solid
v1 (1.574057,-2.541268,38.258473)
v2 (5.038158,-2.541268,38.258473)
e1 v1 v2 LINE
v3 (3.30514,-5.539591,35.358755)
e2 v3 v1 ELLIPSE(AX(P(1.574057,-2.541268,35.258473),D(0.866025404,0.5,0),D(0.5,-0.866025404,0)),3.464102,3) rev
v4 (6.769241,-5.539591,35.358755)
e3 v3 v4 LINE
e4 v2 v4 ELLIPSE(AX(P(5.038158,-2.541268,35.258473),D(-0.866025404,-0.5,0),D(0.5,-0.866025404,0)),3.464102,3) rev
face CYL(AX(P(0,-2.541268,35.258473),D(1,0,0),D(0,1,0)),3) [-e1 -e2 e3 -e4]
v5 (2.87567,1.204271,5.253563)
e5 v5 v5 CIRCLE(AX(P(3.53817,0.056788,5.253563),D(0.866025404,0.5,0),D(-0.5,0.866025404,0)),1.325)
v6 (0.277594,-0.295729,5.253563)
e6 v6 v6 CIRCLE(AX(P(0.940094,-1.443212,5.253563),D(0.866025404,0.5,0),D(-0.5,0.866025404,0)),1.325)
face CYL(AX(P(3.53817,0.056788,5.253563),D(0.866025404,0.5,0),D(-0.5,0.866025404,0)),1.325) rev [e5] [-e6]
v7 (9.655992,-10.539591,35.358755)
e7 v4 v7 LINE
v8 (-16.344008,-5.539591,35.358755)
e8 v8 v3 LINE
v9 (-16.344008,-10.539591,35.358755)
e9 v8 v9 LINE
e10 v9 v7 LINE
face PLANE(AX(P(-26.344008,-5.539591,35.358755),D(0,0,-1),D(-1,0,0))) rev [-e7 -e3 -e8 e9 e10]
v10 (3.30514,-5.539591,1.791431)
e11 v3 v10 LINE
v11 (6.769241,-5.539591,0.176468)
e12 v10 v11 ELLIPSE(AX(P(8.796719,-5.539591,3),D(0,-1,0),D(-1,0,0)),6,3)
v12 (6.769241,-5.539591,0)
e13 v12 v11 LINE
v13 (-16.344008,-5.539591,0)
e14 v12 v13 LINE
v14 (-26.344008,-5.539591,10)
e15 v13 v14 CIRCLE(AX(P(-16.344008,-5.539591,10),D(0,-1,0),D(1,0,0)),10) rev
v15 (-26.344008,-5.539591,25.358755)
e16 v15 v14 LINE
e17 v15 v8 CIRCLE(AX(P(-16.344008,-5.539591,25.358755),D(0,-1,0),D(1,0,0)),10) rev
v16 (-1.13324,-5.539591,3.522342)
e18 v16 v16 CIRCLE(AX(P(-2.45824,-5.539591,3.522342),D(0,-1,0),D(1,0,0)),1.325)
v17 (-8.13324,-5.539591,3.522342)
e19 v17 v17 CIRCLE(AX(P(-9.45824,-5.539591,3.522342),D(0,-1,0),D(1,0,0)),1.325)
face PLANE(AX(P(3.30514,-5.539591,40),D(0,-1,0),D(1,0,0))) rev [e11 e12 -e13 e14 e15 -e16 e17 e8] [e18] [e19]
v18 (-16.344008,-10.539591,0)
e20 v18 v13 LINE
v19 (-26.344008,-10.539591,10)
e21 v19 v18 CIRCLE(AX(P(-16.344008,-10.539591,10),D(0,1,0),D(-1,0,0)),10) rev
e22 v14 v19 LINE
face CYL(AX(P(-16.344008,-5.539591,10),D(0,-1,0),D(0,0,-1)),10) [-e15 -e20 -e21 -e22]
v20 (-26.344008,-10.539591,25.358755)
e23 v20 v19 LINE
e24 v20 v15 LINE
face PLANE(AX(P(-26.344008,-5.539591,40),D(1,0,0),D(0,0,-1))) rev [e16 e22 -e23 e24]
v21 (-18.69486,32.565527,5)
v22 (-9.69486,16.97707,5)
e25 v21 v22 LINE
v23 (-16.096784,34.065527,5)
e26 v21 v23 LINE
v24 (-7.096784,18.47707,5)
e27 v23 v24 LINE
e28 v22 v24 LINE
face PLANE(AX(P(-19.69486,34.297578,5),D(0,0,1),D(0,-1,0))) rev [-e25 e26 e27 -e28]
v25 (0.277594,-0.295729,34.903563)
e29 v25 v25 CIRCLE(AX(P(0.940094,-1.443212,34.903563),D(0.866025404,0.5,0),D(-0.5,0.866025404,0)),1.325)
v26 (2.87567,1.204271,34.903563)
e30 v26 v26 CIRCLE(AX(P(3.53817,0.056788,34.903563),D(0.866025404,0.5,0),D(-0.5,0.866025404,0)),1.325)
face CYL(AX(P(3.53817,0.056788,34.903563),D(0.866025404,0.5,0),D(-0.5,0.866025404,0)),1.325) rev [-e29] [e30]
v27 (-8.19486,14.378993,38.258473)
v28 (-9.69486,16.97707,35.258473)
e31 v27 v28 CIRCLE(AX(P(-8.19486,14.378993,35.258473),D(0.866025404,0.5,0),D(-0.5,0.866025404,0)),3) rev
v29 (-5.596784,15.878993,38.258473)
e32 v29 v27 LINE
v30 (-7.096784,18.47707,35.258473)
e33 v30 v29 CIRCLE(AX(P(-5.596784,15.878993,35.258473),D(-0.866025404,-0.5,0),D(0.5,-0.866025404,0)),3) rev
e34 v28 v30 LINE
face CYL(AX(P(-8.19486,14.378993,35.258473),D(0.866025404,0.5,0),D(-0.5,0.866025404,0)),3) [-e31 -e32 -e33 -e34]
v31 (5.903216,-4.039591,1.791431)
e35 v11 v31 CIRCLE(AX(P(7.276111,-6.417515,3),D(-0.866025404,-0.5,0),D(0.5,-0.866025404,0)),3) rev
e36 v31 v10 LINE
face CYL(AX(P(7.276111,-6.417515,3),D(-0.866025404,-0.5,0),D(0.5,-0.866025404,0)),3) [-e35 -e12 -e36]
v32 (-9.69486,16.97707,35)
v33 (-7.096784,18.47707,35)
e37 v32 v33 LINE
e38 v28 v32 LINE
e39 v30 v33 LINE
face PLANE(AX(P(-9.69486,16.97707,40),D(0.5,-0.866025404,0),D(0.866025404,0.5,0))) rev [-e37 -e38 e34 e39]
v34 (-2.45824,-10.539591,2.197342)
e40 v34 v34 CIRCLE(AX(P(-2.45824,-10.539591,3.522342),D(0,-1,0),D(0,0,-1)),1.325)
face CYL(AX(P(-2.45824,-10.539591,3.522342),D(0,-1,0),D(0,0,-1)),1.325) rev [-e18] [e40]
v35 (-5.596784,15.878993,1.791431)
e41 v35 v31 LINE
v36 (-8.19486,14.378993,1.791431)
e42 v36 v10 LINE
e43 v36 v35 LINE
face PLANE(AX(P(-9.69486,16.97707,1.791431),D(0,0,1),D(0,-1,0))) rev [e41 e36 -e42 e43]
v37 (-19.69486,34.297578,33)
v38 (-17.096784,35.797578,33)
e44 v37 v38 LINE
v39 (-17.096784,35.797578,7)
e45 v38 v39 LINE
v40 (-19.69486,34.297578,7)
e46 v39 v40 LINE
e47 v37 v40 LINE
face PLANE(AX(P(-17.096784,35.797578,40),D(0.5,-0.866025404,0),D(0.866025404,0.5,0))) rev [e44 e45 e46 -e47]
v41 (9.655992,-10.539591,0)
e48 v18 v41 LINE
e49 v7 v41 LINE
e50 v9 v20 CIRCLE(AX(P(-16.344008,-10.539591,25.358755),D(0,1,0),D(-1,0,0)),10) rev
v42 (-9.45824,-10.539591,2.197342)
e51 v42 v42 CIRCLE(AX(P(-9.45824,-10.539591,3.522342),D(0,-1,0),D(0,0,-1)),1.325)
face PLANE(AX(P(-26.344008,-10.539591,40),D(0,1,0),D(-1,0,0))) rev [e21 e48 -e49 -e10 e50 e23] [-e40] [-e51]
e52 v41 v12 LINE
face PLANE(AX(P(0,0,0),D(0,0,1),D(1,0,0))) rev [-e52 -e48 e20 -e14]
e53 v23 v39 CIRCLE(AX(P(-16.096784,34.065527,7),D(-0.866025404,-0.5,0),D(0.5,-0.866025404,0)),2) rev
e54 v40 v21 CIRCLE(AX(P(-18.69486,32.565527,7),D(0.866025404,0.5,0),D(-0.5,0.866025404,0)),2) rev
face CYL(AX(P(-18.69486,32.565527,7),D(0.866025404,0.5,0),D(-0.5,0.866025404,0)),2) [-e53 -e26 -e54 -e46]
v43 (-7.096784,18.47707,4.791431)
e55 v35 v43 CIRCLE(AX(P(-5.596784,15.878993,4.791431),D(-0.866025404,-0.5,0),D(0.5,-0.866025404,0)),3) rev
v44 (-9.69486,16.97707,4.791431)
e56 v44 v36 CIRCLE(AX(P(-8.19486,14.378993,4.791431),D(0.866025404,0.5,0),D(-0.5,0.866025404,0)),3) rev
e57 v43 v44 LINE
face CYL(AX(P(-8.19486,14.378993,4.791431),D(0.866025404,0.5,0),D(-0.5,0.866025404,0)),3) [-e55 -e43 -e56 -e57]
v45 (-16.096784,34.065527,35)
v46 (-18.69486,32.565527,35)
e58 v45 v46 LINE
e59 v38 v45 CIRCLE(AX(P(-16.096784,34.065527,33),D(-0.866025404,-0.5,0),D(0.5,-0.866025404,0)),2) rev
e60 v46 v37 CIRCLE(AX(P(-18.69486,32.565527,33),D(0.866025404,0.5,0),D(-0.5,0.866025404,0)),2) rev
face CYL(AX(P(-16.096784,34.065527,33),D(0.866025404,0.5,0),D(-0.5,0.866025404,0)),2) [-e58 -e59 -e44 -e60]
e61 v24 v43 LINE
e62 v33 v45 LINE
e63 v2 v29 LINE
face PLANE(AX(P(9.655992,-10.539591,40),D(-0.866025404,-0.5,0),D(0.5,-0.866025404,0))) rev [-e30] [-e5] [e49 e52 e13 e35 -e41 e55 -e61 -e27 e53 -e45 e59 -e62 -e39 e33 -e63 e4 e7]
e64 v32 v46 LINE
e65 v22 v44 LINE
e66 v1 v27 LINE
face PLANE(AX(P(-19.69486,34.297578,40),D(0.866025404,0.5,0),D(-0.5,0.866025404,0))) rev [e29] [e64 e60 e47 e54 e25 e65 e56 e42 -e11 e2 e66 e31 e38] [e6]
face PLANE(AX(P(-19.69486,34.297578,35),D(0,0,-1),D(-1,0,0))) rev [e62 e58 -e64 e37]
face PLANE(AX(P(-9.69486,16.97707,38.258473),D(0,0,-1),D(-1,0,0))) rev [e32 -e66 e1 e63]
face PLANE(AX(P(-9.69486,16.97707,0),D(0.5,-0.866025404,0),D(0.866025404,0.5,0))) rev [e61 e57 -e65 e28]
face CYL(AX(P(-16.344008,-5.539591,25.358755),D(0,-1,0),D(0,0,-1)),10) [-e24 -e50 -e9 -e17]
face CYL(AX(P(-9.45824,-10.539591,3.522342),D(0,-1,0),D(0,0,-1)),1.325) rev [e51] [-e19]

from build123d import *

# Parameters (mm, degrees)
EXTRUDE_1_DEPTH                  = 40
HOLE_START                       = 0.092539292
HOLE_WIZARD_3_0_2_65_1_OUTLINE_R = 1.325
HOLE_WIZARD_3_0_2_65_1_DEPTH     = 3
SKETCH_7_W                       = 5
SKETCH_7_H                       = 20
CUT_EXTRUDE_1_DEPTH              = 3
HOLE_START_2                     = -10.539590986
HOLE_WIZARD_3_0_2_65_2_OUTLINE_R = 1.325
HOLE_WIZARD_3_0_2_65_2_DEPTH     = 5
HOLE_WIZARD_3_0_2_65_3_OUTLINE_R = 1.325
HOLE_WIZARD_3_0_2_65_3_DEPTH     = 5
FILLET_3_R                       = 2
SKETCH_20_W                      = 36
SKETCH_20_H                      = 4.641244585
CUT_EXTRUDE_3_DEPTH              = 5
SKETCH_23_W                      = 1.741527355
SKETCH_23_H                      = 27.732050807
CUT_EXTRUDE_4_DEPTH              = 3
SKETCH_24_W                      = 1.79143138
SKETCH_24_H                      = 27.732050807
CUT_EXTRUDE_5_DEPTH              = 3
SKETCH_26_W                      = 1.79143138
SKETCH_26_H                      = 1.733650564
EXTRUDE_2_DEPTH                  = 3
FILLET_4_R                       = 10
FILLET_5_R                       = 3
FILLET_6_R                       = 3
FILLET_7_R                       = 3


# Read off the part's stored shape, not the designer's step: Ø3.0 (2.65) 直径孔1, Ø3.0 (2.65) 直径孔2, Ø3.0 (2.65) 直径孔3
with BuildPart() as part:
    # 草图1 → 凸台-拉伸1 (new body)
    with BuildSketch(Plane.XY):
        Polygon((-26.344007522, -10.539590986), (9.655992478, -10.539590986), (-17.096784272, 35.797577588), (-19.694860483, 34.297577588), (3.305139517, -5.539590986), (-26.344007522, -5.539590986), align=None)
    extrude(amount=EXTRUDE_1_DEPTH)

    # Ø3.0 (2.65) 直径孔1 outline → Ø3.0 (2.65) 直径孔1 (cut)
    with BuildSketch(Plane(origin=(0, 0, 0), x_dir=(0.500000000000004, -0.8660254037844363, 0), z_dir=(0.8660254037844363, 0.5000000000000042, 0)).offset(HOLE_START)):
        with Locations((1.719905554, -5.253562617)):
            Circle(HOLE_WIZARD_3_0_2_65_1_OUTLINE_R)
        with Locations((1.719905554, -34.903562617)):
            Circle(HOLE_WIZARD_3_0_2_65_1_OUTLINE_R)
    extrude(amount=HOLE_WIZARD_3_0_2_65_1_DEPTH, mode=Mode.SUBTRACT)

    # 草图7 → 切除-拉伸1 (cut)
    with BuildSketch(Plane(origin=(2.678217589, 1.546269646, 0), x_dir=(0, 0, -1), z_dir=(0.8660254037844364, 0.5000000000000041, 0))):
        with Locations((-37.5, 29.550003721)):
            Rectangle(SKETCH_7_W, SKETCH_7_H)
        with Locations((-2.5, 29.550003721)):
            Rectangle(SKETCH_7_W, SKETCH_7_H)
    extrude(amount=-CUT_EXTRUDE_1_DEPTH, mode=Mode.SUBTRACT)

    # Ø3.0 (2.65) 直径孔2 outline → Ø3.0 (2.65) 直径孔2 (cut)
    with BuildSketch(Plane(origin=(0, 0, 0), x_dir=(1, 0, 0), z_dir=(0, 1, 0)).offset(HOLE_START_2)):
        with Locations((-9.458240247, -3.522342215)):
            Circle(HOLE_WIZARD_3_0_2_65_2_OUTLINE_R)
        with Locations((-2.458240247, -3.522342215)):
            Circle(HOLE_WIZARD_3_0_2_65_2_OUTLINE_R)
    extrude(amount=HOLE_WIZARD_3_0_2_65_2_DEPTH, mode=Mode.SUBTRACT)

    # Ø3.0 (2.65) 直径孔3 outline → Ø3.0 (2.65) 直径孔3 (cut)
    with BuildSketch(Plane(origin=(0, 0, 0), x_dir=(1, 0, 0), z_dir=(0, 1, 0)).offset(HOLE_START_2)):
        with Locations((-1.947010607, -36.908916004)):
            Circle(HOLE_WIZARD_3_0_2_65_3_OUTLINE_R)
        with Locations((-8.947010607, -36.908916004)):
            Circle(HOLE_WIZARD_3_0_2_65_3_OUTLINE_R)
    extrude(amount=HOLE_WIZARD_3_0_2_65_3_DEPTH, mode=Mode.SUBTRACT)

    # 圆角3
    fillet_3_edges = [part.edges().sort_by_distance(p)[0] for p in [
        (-18.395822378, 35.047577588, 35),
        (-18.395822378, 35.047577588, 5),
    ]]
    fillet(fillet_3_edges, radius=FILLET_3_R)

    # 草图20 → 切除-拉伸3 (cut)
    with BuildSketch(Plane.XZ.offset(10.539590986)):
        with Locations((-8.344007522, 37.679377708)):
            Rectangle(SKETCH_20_W, SKETCH_20_H)
    extrude(amount=-CUT_EXTRUDE_3_DEPTH, mode=Mode.SUBTRACT)

    # 草图23 → 切除-拉伸4 (cut)
    with BuildSketch(Plane(origin=(2.678217589, 1.546269646, 0), x_dir=(0, 0, -1), z_dir=(0.8660254037844364, 0.5000000000000041, 0))):
        with Locations((-39.129236323, 5.683978317)):
            Rectangle(SKETCH_23_W, SKETCH_23_H)
    extrude(amount=-CUT_EXTRUDE_4_DEPTH, mode=Mode.SUBTRACT)

    # 草图24 → 切除-拉伸5 (cut)
    with BuildSketch(Plane(origin=(2.678217589, 1.546269646, 0), x_dir=(0, 0, -1), z_dir=(0.8660254037844364, 0.5000000000000041, 0))):
        with Locations((-0.89571569, 5.683978317)):
            Rectangle(SKETCH_24_W, SKETCH_24_H)
    extrude(amount=-CUT_EXTRUDE_5_DEPTH, mode=Mode.SUBTRACT)

    # 草图26 → 凸台-拉伸2 (add)
    with BuildSketch(Plane(origin=(0.080141377, 0.046269646, 0), x_dir=(0, 0, -1), z_dir=(0.8660254037844364, 0.5000000000000041, 0))):
        with Locations((-0.89571569, -7.316821561)):
            Rectangle(SKETCH_26_W, SKETCH_26_H)
    extrude(amount=EXTRUDE_2_DEPTH)

    # 圆角4
    fillet_4_edges = [part.edges().sort_by_distance(p)[0] for p in [
        (-26.344007522, -8.039590986, 35.358755415),
        (-26.344007522, -8.039590986, 0),
    ]]
    fillet(fillet_4_edges, radius=FILLET_4_R)

    # 圆角5
    fillet_5_edges = [part.edges().sort_by_distance(p)[0] for p in [
        (-8.395822378, 17.727069512, 38.258472645),
        (-8.395822378, 17.727069512, 1.79143138),
    ]]
    fillet(fillet_5_edges, radius=FILLET_5_R)

    # 圆角6
    # the kernel refuses this fillet: 3 mm, written as the material it takes off along each edge
    with BuildSketch(Plane(origin=(14.265049697, -5.539590986, 38.258472645), x_dir=(0, 0, -1), z_dir=(-1, 0, 0))) as fillet_6_piece_1:
        with BuildLine():
            CenterArc((3, -2.998323426), FILLET_6_R, 91.915616688, 88.084383312)
            Line((0, -2.998323426), (-0.06, -2.998323426))
            Line((-0.06, -2.998323426), (-0.06, 0))
            Line((-0.06, 0), (0, 0.06))
            ThreePointArc((0, 0.06), (1.449858615, 0.06), (2.897711575, 0.059966469))
            Line((2.897711575, 0.059966469), (2.89971723, 0))
        make_face()
    extrude(amount=18.455718744, mode=Mode.SUBTRACT)

    # 圆角7
    # the kernel refuses this fillet: 3 mm, written as the material it takes off along each edge
    with BuildSketch(Plane(origin=(-2.639669888, -8.971828296, 0), x_dir=(0, 0, 1), z_dir=(0.8660254037844363, 0.5000000000000041, 0))) as fillet_7_piece_1_section:
        with BuildLine():
            CenterArc((3, 2.745789848), FILLET_7_R, 180, 66.243144393)
            Line((0, 2.745789848), (0, 0))
            Line((0, 0), (1.79143138, 0))
        make_face()
    fillet_7_piece_1 = extrude(amount=16.728949241, mode=Mode.PRIVATE)
    fillet_7_piece_1 = split(fillet_7_piece_1, bisect_by=Plane(origin=(4.952096939, -5.539590986, 0.801424093), z_dir=(0, 1, 0)), keep=Keep.TOP, mode=Mode.PRIVATE)
    add(fillet_7_piece_1, mode=Mode.SUBTRACT)


solid = part.part
